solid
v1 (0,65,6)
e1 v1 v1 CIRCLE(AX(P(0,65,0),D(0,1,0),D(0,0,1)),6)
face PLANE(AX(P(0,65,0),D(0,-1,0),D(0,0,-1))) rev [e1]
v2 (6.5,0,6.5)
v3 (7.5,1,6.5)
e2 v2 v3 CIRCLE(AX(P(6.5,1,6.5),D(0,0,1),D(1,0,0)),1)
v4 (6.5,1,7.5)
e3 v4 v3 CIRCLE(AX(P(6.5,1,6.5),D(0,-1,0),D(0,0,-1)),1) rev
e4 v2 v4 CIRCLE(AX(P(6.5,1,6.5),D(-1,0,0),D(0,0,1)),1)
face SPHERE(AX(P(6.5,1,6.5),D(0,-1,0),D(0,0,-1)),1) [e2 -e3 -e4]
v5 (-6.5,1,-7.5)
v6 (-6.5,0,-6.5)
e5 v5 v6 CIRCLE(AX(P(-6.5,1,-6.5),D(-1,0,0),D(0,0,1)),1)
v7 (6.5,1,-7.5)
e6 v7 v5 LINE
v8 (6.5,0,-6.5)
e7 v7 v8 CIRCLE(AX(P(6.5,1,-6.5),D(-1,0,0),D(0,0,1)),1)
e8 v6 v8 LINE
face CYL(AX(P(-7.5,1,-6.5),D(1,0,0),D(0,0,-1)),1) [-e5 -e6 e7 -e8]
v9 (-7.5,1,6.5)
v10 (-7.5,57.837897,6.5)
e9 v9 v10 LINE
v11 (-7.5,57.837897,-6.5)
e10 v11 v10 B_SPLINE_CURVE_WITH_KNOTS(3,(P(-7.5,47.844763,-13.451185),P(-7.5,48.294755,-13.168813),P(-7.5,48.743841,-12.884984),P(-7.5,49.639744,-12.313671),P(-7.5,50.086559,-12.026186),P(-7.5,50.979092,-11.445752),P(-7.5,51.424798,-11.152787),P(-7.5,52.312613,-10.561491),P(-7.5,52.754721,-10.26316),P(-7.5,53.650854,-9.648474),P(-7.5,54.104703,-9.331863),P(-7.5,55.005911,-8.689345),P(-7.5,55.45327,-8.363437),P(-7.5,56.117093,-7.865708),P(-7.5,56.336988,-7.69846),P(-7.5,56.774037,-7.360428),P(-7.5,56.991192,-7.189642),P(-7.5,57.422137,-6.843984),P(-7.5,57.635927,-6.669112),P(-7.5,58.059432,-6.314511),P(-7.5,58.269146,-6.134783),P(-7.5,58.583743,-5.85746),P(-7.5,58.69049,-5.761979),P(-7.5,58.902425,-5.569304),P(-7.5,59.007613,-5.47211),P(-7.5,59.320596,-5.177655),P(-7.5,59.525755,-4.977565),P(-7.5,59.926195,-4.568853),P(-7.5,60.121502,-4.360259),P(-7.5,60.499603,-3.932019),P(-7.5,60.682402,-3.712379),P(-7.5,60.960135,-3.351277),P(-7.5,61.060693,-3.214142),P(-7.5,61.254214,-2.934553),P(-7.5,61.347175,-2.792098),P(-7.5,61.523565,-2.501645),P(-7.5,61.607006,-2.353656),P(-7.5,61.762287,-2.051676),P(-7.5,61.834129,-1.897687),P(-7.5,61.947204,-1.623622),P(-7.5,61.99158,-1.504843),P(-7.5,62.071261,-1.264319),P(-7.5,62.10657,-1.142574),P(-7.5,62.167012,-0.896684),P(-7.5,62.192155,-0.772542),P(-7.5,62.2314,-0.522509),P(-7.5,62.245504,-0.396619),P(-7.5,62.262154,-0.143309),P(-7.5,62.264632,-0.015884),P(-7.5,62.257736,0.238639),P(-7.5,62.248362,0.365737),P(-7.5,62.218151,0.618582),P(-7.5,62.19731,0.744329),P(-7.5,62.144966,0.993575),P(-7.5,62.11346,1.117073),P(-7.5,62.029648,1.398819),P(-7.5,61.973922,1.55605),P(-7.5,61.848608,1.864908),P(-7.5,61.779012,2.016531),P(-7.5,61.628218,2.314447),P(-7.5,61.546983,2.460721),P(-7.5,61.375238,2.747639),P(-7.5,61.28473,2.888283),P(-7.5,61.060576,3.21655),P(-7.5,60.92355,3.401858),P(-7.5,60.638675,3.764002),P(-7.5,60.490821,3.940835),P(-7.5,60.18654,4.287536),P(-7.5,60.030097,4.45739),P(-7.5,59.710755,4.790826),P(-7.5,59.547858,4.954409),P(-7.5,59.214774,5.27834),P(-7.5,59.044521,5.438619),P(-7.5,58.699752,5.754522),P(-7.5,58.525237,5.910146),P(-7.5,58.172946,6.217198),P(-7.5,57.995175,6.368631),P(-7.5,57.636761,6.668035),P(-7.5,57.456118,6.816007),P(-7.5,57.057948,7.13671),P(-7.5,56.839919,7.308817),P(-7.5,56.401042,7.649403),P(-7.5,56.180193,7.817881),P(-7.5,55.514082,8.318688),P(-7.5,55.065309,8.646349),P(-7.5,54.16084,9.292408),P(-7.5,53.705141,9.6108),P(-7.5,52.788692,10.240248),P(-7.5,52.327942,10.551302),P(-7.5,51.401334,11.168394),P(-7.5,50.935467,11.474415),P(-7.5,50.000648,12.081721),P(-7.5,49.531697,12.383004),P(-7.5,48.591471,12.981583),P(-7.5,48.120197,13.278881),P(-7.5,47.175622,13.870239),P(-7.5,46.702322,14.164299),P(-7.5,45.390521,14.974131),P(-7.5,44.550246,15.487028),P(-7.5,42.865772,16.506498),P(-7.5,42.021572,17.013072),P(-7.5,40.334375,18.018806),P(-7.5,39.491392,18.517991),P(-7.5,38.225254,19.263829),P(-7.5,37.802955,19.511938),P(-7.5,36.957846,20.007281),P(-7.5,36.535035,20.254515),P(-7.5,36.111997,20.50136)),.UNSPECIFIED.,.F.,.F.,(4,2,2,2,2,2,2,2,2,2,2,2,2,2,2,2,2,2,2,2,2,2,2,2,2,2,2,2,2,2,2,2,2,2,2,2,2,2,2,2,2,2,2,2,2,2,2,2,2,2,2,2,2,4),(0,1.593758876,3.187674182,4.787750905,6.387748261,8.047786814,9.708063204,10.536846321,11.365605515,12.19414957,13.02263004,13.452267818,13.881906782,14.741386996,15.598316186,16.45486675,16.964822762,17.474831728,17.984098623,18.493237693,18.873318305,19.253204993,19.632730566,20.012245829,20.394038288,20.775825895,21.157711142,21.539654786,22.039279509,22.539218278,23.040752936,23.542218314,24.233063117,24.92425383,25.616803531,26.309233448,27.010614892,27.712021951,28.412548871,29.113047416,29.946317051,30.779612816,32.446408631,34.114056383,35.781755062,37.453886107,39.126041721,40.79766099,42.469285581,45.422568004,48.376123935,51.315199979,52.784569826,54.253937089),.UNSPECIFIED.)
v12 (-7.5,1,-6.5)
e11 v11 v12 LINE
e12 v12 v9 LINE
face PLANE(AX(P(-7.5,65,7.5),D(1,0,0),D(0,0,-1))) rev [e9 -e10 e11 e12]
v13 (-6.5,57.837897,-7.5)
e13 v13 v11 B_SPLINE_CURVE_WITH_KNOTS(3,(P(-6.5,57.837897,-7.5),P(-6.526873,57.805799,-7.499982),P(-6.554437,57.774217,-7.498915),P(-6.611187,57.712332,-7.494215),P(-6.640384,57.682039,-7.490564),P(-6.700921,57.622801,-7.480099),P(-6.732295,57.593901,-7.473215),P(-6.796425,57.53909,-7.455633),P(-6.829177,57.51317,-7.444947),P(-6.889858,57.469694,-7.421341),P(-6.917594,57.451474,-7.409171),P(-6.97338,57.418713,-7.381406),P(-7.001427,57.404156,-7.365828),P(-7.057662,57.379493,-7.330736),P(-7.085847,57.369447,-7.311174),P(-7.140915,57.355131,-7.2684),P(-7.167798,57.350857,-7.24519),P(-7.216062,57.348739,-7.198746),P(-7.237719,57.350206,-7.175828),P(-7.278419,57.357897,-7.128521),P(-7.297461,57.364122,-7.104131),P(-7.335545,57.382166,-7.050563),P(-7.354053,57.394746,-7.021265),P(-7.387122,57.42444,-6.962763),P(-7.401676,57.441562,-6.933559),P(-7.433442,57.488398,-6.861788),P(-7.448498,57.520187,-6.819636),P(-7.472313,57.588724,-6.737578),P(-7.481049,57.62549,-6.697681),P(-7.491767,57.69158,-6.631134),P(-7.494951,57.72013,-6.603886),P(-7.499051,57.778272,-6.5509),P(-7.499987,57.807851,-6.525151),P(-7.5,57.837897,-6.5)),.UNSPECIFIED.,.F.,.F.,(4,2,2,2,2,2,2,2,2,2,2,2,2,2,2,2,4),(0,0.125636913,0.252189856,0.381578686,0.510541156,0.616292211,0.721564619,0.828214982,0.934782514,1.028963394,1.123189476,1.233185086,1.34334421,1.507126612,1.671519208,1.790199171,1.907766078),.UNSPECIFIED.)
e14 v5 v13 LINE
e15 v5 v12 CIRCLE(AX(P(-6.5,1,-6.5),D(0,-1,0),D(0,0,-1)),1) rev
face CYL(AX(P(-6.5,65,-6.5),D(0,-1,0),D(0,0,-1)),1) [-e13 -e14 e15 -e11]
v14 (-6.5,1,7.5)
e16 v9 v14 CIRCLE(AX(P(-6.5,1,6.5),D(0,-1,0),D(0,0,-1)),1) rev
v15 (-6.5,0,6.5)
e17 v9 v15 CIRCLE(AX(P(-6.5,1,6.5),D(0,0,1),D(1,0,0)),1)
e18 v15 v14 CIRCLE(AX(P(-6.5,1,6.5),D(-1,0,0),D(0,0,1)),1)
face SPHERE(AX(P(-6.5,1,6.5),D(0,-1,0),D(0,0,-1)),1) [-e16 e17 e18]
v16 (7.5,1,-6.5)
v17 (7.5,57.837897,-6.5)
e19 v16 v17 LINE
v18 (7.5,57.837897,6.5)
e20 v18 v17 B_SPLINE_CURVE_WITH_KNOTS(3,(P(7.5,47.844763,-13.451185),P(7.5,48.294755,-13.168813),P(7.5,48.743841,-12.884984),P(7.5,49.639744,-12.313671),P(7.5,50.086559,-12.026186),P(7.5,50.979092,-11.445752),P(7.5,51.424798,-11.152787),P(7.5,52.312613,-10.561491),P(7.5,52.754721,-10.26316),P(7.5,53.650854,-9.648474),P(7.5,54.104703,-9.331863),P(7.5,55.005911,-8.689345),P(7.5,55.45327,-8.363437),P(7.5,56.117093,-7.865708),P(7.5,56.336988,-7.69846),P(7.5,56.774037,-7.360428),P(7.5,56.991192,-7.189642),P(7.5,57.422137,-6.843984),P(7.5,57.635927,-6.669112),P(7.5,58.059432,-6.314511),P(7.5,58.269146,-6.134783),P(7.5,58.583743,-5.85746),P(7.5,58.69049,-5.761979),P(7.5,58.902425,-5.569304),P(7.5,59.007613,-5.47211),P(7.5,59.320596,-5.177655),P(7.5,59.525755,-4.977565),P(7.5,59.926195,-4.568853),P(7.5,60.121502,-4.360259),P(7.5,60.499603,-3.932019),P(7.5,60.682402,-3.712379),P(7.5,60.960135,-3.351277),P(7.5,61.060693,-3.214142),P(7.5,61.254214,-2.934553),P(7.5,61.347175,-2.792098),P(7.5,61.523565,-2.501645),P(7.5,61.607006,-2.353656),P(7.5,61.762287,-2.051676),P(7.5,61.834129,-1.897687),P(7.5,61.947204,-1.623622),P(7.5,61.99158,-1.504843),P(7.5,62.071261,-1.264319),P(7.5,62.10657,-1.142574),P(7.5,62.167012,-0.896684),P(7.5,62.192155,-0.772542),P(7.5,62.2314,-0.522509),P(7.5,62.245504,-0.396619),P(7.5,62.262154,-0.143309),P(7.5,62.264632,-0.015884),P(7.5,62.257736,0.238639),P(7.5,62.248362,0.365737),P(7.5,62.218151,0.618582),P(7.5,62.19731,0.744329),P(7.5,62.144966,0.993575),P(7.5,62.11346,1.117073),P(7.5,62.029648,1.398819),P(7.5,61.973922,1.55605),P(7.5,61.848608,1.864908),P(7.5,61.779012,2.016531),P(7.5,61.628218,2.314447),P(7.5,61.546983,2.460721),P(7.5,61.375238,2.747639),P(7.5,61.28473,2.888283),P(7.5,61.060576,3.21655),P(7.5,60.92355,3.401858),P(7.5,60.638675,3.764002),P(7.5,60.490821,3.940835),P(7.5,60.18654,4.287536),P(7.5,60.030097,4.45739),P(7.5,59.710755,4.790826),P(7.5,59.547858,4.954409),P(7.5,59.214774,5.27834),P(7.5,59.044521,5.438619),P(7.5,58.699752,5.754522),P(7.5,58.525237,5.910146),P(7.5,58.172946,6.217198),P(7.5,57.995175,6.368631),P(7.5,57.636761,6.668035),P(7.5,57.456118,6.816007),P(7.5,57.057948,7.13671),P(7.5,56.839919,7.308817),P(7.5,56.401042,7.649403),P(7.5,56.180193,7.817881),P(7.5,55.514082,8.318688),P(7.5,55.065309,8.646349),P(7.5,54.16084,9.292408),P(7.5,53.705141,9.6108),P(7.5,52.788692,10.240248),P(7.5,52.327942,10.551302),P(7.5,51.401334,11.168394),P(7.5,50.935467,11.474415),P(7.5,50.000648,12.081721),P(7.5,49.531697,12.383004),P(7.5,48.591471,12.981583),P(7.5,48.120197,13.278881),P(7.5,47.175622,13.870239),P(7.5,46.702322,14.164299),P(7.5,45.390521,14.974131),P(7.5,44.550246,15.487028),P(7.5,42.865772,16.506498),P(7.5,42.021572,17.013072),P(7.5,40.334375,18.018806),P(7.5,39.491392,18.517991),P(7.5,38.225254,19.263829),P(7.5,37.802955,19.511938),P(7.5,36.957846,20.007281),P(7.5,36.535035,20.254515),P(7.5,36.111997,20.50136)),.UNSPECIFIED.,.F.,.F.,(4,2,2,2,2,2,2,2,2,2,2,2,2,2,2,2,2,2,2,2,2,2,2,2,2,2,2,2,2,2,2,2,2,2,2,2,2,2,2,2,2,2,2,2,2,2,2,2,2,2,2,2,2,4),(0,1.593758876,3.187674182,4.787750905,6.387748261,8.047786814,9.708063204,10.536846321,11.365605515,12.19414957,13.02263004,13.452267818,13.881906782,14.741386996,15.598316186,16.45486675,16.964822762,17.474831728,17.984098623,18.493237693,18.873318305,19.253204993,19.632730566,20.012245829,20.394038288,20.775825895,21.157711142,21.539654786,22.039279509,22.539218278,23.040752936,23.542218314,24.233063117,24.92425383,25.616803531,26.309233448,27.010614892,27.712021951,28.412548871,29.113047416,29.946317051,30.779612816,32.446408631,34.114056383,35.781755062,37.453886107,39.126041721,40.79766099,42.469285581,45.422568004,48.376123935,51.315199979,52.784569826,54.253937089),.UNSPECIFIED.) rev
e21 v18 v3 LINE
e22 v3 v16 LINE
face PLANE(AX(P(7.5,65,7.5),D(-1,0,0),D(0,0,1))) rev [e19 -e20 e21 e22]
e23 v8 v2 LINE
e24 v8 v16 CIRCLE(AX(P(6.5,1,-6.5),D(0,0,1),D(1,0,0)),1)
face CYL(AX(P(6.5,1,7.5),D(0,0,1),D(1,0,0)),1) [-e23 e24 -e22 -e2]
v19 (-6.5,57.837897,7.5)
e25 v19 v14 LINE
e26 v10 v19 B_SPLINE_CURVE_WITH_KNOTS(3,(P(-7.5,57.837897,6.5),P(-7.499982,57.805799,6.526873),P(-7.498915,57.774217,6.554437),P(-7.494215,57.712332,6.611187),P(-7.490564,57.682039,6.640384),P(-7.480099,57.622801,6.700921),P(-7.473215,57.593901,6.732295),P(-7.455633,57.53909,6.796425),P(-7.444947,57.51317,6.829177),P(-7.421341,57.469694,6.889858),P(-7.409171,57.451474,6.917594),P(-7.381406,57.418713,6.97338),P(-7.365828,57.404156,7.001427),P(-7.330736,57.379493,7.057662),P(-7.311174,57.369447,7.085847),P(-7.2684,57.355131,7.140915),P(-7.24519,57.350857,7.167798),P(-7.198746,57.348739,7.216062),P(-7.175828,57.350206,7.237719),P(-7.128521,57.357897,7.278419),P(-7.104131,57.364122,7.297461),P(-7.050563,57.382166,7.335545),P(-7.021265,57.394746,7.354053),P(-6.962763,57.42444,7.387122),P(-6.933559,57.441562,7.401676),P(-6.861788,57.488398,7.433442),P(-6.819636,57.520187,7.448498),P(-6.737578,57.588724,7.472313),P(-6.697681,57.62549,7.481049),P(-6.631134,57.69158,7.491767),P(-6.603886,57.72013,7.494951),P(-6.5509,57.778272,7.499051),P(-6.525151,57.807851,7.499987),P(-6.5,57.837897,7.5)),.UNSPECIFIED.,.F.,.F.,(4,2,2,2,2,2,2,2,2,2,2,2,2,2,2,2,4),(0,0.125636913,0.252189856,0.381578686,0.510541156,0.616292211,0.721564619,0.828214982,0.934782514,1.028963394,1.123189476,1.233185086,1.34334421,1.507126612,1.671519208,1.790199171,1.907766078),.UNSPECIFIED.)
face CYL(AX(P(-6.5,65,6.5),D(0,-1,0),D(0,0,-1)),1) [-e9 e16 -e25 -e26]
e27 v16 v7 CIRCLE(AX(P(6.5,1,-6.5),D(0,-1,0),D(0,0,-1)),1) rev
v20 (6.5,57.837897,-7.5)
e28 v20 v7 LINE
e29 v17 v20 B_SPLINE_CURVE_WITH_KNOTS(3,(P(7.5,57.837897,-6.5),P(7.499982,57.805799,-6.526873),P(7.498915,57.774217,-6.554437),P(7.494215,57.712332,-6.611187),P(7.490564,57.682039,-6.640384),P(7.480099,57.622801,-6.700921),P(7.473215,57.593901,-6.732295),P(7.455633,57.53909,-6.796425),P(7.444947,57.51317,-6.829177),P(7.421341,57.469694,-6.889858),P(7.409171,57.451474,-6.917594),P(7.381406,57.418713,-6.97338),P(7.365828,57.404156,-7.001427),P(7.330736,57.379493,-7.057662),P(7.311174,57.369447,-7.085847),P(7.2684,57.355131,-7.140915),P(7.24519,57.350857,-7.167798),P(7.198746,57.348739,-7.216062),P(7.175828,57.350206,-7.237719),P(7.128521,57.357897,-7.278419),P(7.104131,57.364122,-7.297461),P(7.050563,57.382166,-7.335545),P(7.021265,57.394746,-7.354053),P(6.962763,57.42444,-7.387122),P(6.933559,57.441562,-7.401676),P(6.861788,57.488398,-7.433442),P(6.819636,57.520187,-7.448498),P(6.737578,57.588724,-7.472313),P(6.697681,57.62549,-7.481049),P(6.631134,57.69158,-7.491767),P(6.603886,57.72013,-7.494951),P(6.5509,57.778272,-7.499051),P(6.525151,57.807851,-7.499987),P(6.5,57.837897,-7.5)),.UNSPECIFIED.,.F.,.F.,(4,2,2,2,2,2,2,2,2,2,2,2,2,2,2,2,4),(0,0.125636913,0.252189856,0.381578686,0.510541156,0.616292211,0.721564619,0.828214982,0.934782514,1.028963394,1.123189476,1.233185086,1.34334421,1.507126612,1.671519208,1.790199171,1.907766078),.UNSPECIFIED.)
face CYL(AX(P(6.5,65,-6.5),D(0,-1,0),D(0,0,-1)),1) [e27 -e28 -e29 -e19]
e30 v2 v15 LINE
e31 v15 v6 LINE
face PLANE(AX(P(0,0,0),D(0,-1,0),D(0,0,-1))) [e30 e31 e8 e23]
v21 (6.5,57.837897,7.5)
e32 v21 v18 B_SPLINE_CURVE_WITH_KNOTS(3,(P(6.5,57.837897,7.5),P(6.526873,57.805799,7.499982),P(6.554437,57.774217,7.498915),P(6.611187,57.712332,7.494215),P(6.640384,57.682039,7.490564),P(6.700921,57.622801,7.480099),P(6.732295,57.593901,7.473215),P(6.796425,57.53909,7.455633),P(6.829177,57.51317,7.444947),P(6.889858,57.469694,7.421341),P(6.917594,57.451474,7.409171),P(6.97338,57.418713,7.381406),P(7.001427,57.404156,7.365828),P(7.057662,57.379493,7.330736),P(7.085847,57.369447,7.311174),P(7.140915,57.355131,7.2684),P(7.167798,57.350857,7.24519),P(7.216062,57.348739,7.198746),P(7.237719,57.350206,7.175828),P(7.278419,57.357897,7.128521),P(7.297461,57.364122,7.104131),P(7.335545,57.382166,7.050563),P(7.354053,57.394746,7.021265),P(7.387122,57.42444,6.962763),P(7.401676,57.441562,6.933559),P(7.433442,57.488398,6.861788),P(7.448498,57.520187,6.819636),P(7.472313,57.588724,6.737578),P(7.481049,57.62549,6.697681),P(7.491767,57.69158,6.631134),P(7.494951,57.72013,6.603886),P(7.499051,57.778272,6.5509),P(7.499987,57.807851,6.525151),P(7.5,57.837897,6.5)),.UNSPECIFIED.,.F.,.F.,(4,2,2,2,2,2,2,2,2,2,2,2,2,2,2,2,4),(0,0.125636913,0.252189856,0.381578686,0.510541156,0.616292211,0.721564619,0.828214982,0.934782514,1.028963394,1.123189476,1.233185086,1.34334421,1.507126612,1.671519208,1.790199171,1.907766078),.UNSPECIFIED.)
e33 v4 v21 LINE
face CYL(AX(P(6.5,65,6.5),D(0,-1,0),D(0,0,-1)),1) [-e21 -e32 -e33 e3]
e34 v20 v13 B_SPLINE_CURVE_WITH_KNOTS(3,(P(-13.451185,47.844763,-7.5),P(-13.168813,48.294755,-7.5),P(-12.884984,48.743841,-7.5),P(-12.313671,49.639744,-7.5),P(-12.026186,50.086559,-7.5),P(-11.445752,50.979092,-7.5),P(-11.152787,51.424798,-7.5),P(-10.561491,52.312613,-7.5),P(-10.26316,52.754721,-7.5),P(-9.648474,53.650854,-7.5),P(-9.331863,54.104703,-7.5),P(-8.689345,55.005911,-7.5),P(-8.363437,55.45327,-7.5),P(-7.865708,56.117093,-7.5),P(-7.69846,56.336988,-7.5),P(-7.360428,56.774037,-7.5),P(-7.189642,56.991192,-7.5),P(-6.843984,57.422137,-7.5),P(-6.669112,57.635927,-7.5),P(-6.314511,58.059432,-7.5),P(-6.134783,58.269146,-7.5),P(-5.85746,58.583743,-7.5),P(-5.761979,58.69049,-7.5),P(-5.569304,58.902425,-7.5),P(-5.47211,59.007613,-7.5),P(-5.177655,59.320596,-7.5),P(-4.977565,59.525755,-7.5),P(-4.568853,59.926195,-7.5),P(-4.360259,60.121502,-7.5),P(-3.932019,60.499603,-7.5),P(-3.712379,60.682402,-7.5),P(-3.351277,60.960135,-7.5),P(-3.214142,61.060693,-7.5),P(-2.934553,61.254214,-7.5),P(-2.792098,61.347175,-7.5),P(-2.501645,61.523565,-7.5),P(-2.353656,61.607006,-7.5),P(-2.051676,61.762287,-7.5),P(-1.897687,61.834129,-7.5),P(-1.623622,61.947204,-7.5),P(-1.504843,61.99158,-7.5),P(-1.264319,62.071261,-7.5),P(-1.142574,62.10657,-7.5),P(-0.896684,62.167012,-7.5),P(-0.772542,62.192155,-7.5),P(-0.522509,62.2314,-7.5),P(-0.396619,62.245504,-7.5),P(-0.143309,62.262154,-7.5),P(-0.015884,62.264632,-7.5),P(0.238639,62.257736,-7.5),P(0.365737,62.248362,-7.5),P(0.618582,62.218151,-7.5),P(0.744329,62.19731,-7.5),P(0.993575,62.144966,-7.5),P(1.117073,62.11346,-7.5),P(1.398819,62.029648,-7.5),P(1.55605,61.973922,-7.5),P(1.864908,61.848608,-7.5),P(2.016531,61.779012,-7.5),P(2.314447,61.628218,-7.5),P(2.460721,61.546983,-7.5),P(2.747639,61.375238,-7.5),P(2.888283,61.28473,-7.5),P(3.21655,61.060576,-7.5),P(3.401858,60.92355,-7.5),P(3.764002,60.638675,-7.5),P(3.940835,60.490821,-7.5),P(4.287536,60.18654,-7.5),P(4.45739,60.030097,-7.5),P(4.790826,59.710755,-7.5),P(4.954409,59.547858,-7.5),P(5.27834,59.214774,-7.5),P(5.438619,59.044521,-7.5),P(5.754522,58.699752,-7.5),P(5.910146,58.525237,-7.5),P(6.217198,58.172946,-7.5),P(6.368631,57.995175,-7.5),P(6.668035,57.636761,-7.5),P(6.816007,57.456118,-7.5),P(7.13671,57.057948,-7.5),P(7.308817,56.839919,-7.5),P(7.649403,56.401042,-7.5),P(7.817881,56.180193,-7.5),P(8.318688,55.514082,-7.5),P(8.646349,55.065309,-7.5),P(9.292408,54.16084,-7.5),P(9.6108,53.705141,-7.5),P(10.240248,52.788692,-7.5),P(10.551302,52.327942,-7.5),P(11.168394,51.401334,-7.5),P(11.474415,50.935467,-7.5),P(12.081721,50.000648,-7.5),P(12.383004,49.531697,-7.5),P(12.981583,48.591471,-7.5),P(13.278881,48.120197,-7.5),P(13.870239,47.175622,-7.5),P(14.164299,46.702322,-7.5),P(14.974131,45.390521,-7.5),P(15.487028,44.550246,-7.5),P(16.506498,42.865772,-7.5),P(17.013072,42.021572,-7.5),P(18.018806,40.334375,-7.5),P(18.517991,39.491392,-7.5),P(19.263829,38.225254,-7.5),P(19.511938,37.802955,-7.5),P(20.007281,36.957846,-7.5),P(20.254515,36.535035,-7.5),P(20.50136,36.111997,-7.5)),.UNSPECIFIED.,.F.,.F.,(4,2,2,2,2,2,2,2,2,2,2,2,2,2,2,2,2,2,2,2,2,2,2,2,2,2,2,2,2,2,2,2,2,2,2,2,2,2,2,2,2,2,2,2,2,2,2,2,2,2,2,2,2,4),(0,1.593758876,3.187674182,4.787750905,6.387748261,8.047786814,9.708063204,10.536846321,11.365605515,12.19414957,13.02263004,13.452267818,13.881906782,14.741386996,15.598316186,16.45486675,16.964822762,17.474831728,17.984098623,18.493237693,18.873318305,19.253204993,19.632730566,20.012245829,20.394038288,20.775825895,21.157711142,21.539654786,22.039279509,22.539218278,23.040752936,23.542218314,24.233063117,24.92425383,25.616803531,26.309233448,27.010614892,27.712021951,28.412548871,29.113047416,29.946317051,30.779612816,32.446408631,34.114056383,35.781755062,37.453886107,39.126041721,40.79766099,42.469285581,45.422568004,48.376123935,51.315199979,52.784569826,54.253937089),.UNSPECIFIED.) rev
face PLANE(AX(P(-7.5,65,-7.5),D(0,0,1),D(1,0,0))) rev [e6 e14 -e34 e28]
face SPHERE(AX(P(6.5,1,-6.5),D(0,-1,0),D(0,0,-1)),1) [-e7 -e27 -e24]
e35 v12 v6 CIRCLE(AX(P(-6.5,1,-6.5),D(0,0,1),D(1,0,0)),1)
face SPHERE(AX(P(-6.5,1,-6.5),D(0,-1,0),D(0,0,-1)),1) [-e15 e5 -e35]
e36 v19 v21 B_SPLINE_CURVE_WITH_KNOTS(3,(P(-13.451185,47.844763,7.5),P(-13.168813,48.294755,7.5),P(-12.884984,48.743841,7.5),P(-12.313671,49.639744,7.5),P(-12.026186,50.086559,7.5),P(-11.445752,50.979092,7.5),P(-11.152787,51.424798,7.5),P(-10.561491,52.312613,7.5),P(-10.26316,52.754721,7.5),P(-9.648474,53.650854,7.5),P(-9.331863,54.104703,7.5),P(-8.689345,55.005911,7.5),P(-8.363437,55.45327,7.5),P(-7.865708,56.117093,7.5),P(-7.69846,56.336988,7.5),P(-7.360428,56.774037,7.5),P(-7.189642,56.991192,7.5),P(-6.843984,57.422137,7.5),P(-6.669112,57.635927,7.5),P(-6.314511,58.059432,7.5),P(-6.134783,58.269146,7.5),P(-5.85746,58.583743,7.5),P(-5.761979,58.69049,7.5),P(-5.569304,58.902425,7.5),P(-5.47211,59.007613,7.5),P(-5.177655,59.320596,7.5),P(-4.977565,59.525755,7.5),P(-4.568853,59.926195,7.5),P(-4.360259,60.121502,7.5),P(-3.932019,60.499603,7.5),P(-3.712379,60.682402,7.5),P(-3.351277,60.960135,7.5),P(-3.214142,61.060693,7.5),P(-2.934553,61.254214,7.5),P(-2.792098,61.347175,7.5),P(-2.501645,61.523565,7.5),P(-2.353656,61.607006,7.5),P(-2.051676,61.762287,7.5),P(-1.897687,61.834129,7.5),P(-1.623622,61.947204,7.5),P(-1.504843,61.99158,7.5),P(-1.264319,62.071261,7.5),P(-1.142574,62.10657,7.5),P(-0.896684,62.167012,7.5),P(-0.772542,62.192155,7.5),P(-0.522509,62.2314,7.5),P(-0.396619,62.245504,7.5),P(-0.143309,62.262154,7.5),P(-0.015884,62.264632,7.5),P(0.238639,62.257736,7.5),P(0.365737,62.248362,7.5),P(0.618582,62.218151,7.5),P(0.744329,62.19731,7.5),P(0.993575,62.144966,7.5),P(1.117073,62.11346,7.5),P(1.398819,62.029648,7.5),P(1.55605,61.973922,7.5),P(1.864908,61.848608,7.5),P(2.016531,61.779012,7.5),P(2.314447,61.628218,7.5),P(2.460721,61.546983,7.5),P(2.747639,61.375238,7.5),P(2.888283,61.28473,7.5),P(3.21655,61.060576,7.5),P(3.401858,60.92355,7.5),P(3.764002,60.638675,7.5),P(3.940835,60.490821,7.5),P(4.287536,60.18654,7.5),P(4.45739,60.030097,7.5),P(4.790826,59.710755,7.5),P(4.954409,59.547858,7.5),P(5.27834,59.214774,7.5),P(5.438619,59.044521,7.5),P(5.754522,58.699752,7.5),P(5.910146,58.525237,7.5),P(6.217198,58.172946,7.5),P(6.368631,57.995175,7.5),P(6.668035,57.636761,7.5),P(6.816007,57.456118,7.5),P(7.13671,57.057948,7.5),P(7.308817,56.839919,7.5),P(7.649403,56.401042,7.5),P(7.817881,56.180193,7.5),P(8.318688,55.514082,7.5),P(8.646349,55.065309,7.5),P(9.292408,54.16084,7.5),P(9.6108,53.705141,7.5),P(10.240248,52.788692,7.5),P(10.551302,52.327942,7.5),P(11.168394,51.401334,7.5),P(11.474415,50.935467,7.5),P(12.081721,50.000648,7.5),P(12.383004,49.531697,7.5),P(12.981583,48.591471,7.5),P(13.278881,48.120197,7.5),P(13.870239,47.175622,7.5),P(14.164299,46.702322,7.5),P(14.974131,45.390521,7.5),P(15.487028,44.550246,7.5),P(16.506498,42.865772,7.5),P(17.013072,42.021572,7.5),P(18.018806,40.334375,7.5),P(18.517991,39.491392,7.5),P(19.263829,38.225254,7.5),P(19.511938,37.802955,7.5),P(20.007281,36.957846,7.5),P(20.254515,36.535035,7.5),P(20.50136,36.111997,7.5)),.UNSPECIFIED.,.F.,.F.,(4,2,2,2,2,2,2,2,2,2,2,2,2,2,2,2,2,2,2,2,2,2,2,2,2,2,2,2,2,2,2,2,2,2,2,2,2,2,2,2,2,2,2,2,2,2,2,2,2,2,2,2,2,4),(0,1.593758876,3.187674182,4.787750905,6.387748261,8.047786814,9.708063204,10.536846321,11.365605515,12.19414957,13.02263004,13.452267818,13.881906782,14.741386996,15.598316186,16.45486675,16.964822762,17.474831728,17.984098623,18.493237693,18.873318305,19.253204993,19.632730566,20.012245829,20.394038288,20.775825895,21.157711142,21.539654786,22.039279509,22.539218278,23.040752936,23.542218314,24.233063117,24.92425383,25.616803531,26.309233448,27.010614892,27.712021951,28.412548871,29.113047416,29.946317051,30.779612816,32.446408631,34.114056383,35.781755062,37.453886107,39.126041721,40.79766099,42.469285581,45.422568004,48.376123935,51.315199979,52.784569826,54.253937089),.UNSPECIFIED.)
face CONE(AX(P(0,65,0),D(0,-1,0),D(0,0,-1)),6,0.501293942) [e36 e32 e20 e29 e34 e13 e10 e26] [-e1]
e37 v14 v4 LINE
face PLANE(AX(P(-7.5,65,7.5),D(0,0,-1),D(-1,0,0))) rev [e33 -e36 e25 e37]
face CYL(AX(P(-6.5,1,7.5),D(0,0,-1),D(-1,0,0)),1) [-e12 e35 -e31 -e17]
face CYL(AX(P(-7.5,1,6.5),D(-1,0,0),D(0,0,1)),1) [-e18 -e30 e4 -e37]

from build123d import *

# Parameters (mm, degrees)
SKETCH1_W           = 15
SKETCH1_H           = 15
BOSS_EXTRUDE1_DEPTH = 65
FILLET1_R           = 1
FILLET2_R           = 1


with BuildPart() as part:
    # Sketch1 → Boss-Extrude1 (new body)
    with BuildSketch(Plane(origin=(0, 0, 0), x_dir=(1, 0, 0), z_dir=(0, 1, 0))):
        Rectangle(SKETCH1_W, SKETCH1_H)
    extrude(amount=BOSS_EXTRUDE1_DEPTH)

    # Sketch2 → Cut-Revolve4 (revolve, cut)
    with BuildSketch(Plane.XY):
        Polygon((6, 65), (10.984781161, 55.903414997), (10.984781161, 65), align=None)
    revolve(axis=Axis((0, 73.5, 0), (0, -1, 0)), mode=Mode.SUBTRACT)

    # Fillet1
    fillet1_edges = [part.edges().sort_by_distance(p)[0] for p in [
        (-7.5, 28.29677194, -7.5),
        (7.5, 28.29677194, -7.5),
        (7.5, 28.29677194, 7.5),
        (-7.5, 28.29677194, 7.5),
    ]]
    fillet(fillet1_edges, radius=FILLET1_R)

    # Fillet2
    fillet2_edges = [part.edges().sort_by_distance(p)[0] for p in [
        (-7.207106781, 0, 7.207106781),
        (-7.5, 0, 0),
        (-7.207106781, 0, -7.207106781),
        (0, 0, -7.5),
        (7.207106781, 0, -7.207106781),
        (7.5, 0, 0),
        (7.207106781, 0, 7.207106781),
        (0, 0, 7.5),
    ]]
    fillet(fillet2_edges, radius=FILLET2_R)


solid = part.part
